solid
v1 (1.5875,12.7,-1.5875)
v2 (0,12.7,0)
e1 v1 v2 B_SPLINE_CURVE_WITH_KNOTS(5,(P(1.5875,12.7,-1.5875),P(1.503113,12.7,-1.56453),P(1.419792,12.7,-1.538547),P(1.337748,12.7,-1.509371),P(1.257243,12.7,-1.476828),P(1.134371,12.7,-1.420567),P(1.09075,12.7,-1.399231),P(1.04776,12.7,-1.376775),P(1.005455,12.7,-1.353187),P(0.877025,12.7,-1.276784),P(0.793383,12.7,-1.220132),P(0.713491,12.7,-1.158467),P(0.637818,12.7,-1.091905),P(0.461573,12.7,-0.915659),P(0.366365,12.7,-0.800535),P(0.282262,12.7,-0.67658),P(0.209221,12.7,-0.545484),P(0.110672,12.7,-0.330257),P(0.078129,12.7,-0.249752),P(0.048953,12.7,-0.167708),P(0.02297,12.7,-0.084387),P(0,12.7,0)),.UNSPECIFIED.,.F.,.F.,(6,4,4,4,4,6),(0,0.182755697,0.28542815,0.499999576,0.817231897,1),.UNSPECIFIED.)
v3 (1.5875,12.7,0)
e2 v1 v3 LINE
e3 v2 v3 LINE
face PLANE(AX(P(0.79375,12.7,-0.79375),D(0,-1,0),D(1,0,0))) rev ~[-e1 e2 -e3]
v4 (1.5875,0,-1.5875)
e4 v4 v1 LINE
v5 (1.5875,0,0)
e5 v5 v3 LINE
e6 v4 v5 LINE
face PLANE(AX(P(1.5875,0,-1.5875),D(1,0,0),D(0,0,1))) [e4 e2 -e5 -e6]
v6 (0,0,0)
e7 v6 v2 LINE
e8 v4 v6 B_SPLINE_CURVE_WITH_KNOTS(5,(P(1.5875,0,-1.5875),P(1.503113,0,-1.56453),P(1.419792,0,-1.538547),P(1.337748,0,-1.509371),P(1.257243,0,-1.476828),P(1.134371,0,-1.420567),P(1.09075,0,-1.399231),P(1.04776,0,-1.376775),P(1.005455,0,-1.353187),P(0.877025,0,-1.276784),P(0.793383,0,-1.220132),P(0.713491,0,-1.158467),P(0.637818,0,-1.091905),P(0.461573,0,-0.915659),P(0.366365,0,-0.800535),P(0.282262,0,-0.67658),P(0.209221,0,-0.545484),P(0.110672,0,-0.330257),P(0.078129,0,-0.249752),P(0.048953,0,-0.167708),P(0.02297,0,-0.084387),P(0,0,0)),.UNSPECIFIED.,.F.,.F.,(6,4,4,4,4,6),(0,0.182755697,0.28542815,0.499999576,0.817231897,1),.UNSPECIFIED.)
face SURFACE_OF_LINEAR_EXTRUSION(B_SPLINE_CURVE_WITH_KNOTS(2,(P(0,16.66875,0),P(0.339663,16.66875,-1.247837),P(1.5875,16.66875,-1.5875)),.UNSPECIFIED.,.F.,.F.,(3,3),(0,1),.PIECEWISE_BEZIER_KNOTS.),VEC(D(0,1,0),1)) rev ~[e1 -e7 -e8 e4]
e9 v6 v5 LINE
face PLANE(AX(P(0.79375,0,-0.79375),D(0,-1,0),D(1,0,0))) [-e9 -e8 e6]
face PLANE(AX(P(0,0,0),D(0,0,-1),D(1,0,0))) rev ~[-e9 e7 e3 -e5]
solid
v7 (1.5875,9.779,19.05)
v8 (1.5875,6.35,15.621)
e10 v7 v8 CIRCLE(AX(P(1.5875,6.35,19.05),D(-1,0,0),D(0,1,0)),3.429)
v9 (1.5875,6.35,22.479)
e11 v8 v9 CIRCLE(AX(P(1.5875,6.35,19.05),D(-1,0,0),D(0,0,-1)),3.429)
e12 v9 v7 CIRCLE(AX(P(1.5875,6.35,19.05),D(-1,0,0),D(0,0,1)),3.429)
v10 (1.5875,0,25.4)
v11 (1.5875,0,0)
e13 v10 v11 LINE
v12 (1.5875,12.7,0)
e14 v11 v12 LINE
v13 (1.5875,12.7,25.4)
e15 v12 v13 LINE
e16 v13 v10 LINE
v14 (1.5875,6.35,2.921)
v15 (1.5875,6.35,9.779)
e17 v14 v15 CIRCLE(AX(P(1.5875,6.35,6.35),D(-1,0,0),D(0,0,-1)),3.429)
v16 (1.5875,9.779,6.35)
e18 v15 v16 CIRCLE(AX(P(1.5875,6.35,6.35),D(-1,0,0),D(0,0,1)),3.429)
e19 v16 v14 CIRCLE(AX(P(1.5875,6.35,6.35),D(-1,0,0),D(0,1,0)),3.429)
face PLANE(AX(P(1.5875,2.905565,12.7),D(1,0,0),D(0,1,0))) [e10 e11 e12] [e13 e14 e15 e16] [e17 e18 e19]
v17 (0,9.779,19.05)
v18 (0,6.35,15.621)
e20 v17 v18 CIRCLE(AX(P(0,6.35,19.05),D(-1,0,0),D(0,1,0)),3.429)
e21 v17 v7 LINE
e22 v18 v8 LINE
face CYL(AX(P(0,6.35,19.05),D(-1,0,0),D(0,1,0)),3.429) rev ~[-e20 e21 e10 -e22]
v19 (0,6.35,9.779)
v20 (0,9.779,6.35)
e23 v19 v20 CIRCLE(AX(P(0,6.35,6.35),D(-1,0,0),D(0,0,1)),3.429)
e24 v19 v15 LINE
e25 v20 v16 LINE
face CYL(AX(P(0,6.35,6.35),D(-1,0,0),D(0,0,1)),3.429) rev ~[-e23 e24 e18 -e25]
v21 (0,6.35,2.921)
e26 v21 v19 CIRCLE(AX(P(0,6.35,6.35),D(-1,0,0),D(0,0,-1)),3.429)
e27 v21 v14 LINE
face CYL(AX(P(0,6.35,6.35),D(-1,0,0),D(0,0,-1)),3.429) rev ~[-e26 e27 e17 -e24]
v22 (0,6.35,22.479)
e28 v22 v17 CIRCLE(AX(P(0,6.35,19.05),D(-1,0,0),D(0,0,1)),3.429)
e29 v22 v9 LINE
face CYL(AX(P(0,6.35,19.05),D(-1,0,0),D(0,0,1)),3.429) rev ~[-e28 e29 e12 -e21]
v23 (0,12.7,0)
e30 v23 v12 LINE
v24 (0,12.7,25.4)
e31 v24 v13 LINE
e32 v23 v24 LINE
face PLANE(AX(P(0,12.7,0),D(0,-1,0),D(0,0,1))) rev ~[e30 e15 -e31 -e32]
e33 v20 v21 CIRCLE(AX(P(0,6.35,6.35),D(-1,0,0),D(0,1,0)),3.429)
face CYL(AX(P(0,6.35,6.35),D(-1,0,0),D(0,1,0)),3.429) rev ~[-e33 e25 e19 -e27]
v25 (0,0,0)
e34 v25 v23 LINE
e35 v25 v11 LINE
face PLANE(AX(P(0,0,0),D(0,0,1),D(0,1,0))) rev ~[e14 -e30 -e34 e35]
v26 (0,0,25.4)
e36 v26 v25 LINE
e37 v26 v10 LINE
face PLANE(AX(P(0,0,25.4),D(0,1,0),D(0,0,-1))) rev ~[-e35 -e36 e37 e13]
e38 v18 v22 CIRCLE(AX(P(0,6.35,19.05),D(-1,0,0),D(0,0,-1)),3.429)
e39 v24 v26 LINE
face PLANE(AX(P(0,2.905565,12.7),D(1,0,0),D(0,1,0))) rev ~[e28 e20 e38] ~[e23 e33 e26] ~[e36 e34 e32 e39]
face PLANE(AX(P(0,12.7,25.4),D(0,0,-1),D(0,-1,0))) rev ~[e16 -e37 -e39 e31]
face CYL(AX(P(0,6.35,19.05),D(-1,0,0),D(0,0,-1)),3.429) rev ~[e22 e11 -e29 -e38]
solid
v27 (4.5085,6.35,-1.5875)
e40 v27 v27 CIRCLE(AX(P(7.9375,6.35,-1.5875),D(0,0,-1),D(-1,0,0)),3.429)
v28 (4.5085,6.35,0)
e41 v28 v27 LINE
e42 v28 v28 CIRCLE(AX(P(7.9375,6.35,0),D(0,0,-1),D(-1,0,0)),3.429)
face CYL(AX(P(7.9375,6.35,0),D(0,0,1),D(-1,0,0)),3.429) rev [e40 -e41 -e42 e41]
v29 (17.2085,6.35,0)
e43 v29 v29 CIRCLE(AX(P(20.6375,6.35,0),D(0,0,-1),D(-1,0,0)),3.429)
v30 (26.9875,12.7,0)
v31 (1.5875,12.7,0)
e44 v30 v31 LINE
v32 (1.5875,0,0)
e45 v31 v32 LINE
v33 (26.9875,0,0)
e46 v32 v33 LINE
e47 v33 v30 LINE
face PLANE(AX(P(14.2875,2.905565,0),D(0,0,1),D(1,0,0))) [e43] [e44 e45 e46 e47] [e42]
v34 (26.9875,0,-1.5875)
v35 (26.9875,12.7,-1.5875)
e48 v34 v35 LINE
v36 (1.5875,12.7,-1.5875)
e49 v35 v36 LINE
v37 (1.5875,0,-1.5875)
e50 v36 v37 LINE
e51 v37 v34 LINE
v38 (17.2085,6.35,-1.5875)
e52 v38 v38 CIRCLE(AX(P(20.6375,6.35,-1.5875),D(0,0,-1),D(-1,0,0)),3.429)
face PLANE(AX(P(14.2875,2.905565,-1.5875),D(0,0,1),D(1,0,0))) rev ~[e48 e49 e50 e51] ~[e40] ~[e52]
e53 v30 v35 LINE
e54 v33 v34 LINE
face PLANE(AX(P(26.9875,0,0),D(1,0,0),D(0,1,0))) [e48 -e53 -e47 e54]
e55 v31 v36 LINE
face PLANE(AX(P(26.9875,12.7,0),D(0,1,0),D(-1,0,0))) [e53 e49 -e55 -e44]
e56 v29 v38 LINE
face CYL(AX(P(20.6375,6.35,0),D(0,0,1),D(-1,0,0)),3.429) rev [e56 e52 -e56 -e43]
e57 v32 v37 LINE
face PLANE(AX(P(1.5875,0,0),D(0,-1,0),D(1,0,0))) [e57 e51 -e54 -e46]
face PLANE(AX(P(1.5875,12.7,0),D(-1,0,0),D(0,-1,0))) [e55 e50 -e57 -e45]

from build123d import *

# Parameters (mm, degrees)
F1_DEPTH    = 1.5875
F3_DEPTH    = 1.5875
F4_W        = 1.5875
F4_H        = 1.5875
F5_DEPTH    = 12.7
F6_T1_DEPTH = 20.6375


# Not quite as in the source:
# - a fillet or chamfer that OpenCascade refuses, or shapes differently, is made with other operations: its cross-section is extruded or revolved along the edge and cut away or added


with BuildPart() as f1:
    # F0 (on Right) → F1 (new body)
    with BuildSketch(Plane.YZ):
        with BuildLine():
            Line((0, 25.4), (0, 0))
            Line((0, 0), (6.35, 0))
            Line((6.35, 0), (6.35, 2.921))
            ThreePointArc((6.35, 2.921), (2.921, 6.35), (6.35, 9.779))
            Line((6.35, 9.779), (6.35, 12.7))
            Line((6.35, 12.7), (6.35, 15.621))
            ThreePointArc((6.35, 15.621), (2.921, 19.05), (6.35, 22.479))
            Line((6.35, 22.479), (6.35, 25.4))
            Line((6.35, 25.4), (0, 25.4))
        make_face()
        with BuildLine():
            Line((6.35, 2.921), (6.35, 0))
            Line((6.35, 0), (12.7, 0))
            Line((12.7, 0), (12.7, 25.4))
            Line((12.7, 25.4), (6.35, 25.4))
            Line((6.35, 25.4), (6.35, 22.479))
            ThreePointArc((6.35, 22.479), (8.7746691527, 21.4746691527), (9.779, 19.05))
            ThreePointArc((9.779, 19.05), (8.7746691527, 16.6253308473), (6.35, 15.621))
            Line((6.35, 15.621), (6.35, 12.7))
            Line((6.35, 12.7), (6.35, 9.779))
            ThreePointArc((6.35, 9.779), (8.7746691527, 8.7746691527), (9.779, 6.35))
            ThreePointArc((9.779, 6.35), (8.7746691527, 3.9253308473), (6.35, 2.921))
        make_face()
    extrude(amount=F1_DEPTH)


with BuildPart() as f3:
    # F2 (on Top) → F3 (new body)
    with BuildSketch(Plane.XY):
        with BuildLine():
            Line((1.5875, 6.35), (1.5875, 0))
            Line((1.5875, 0), (26.9875, 0))
            Line((26.9875, 0), (26.9875, 6.35))
            Line((26.9875, 6.35), (24.0665, 6.35))
            ThreePointArc((24.0665, 6.35), (20.6375, 2.921), (17.2085, 6.35))
            Line((17.2085, 6.35), (14.2875, 6.35))
            Line((14.2875, 6.35), (11.3665, 6.35))
            ThreePointArc((11.3665, 6.35), (7.9375, 2.921), (4.5085, 6.35))
            Line((4.5085, 6.35), (1.5875, 6.35))
        make_face()
        with BuildLine():
            Line((1.5875, 12.7), (1.5875, 6.35))
            Line((1.5875, 6.35), (4.5085, 6.35))
            ThreePointArc((4.5085, 6.35), (7.9375, 9.779), (11.3665, 6.35))
            Line((11.3665, 6.35), (14.2875, 6.35))
            Line((14.2875, 6.35), (17.2085, 6.35))
            ThreePointArc((17.2085, 6.35), (20.6375, 9.779), (24.0665, 6.35))
            Line((24.0665, 6.35), (26.9875, 6.35))
            Line((26.9875, 6.35), (26.9875, 12.7))
            Line((26.9875, 12.7), (1.5875, 12.7))
        make_face()
    extrude(amount=-F3_DEPTH)


with BuildPart() as f5:
    # F4 (on Front) → F5 (new body, through all)
    with BuildSketch(Plane.XZ):
        with Locations((0.79375, -0.79375)):
            Rectangle(F4_W, F4_H)
    extrude(amount=-F5_DEPTH)

    # F6: fillet of radius 2.2606 on 1 edges, made by hand

    # F6_s2 → F6_t1 (cut)
    with BuildSketch(Plane.XZ.offset(-16.66875)):
        with BuildLine():
            add(Edge.make_bspline(
                [(0, 0), (0.3396631777, -1.2478368223), (1.5875, -1.5875)],
                knots=[0, 0, 0, 1, 1, 1], degree=2, weights=[1, 1, 1]))
            Line((1.5875, -1.5875), (0, -1.5875))
            Line((0, -1.5875), (0, 0))
        make_face()
    extrude(amount=F6_T1_DEPTH, mode=Mode.SUBTRACT)


solid = Compound([f1.part, f3.part, f5.part])
